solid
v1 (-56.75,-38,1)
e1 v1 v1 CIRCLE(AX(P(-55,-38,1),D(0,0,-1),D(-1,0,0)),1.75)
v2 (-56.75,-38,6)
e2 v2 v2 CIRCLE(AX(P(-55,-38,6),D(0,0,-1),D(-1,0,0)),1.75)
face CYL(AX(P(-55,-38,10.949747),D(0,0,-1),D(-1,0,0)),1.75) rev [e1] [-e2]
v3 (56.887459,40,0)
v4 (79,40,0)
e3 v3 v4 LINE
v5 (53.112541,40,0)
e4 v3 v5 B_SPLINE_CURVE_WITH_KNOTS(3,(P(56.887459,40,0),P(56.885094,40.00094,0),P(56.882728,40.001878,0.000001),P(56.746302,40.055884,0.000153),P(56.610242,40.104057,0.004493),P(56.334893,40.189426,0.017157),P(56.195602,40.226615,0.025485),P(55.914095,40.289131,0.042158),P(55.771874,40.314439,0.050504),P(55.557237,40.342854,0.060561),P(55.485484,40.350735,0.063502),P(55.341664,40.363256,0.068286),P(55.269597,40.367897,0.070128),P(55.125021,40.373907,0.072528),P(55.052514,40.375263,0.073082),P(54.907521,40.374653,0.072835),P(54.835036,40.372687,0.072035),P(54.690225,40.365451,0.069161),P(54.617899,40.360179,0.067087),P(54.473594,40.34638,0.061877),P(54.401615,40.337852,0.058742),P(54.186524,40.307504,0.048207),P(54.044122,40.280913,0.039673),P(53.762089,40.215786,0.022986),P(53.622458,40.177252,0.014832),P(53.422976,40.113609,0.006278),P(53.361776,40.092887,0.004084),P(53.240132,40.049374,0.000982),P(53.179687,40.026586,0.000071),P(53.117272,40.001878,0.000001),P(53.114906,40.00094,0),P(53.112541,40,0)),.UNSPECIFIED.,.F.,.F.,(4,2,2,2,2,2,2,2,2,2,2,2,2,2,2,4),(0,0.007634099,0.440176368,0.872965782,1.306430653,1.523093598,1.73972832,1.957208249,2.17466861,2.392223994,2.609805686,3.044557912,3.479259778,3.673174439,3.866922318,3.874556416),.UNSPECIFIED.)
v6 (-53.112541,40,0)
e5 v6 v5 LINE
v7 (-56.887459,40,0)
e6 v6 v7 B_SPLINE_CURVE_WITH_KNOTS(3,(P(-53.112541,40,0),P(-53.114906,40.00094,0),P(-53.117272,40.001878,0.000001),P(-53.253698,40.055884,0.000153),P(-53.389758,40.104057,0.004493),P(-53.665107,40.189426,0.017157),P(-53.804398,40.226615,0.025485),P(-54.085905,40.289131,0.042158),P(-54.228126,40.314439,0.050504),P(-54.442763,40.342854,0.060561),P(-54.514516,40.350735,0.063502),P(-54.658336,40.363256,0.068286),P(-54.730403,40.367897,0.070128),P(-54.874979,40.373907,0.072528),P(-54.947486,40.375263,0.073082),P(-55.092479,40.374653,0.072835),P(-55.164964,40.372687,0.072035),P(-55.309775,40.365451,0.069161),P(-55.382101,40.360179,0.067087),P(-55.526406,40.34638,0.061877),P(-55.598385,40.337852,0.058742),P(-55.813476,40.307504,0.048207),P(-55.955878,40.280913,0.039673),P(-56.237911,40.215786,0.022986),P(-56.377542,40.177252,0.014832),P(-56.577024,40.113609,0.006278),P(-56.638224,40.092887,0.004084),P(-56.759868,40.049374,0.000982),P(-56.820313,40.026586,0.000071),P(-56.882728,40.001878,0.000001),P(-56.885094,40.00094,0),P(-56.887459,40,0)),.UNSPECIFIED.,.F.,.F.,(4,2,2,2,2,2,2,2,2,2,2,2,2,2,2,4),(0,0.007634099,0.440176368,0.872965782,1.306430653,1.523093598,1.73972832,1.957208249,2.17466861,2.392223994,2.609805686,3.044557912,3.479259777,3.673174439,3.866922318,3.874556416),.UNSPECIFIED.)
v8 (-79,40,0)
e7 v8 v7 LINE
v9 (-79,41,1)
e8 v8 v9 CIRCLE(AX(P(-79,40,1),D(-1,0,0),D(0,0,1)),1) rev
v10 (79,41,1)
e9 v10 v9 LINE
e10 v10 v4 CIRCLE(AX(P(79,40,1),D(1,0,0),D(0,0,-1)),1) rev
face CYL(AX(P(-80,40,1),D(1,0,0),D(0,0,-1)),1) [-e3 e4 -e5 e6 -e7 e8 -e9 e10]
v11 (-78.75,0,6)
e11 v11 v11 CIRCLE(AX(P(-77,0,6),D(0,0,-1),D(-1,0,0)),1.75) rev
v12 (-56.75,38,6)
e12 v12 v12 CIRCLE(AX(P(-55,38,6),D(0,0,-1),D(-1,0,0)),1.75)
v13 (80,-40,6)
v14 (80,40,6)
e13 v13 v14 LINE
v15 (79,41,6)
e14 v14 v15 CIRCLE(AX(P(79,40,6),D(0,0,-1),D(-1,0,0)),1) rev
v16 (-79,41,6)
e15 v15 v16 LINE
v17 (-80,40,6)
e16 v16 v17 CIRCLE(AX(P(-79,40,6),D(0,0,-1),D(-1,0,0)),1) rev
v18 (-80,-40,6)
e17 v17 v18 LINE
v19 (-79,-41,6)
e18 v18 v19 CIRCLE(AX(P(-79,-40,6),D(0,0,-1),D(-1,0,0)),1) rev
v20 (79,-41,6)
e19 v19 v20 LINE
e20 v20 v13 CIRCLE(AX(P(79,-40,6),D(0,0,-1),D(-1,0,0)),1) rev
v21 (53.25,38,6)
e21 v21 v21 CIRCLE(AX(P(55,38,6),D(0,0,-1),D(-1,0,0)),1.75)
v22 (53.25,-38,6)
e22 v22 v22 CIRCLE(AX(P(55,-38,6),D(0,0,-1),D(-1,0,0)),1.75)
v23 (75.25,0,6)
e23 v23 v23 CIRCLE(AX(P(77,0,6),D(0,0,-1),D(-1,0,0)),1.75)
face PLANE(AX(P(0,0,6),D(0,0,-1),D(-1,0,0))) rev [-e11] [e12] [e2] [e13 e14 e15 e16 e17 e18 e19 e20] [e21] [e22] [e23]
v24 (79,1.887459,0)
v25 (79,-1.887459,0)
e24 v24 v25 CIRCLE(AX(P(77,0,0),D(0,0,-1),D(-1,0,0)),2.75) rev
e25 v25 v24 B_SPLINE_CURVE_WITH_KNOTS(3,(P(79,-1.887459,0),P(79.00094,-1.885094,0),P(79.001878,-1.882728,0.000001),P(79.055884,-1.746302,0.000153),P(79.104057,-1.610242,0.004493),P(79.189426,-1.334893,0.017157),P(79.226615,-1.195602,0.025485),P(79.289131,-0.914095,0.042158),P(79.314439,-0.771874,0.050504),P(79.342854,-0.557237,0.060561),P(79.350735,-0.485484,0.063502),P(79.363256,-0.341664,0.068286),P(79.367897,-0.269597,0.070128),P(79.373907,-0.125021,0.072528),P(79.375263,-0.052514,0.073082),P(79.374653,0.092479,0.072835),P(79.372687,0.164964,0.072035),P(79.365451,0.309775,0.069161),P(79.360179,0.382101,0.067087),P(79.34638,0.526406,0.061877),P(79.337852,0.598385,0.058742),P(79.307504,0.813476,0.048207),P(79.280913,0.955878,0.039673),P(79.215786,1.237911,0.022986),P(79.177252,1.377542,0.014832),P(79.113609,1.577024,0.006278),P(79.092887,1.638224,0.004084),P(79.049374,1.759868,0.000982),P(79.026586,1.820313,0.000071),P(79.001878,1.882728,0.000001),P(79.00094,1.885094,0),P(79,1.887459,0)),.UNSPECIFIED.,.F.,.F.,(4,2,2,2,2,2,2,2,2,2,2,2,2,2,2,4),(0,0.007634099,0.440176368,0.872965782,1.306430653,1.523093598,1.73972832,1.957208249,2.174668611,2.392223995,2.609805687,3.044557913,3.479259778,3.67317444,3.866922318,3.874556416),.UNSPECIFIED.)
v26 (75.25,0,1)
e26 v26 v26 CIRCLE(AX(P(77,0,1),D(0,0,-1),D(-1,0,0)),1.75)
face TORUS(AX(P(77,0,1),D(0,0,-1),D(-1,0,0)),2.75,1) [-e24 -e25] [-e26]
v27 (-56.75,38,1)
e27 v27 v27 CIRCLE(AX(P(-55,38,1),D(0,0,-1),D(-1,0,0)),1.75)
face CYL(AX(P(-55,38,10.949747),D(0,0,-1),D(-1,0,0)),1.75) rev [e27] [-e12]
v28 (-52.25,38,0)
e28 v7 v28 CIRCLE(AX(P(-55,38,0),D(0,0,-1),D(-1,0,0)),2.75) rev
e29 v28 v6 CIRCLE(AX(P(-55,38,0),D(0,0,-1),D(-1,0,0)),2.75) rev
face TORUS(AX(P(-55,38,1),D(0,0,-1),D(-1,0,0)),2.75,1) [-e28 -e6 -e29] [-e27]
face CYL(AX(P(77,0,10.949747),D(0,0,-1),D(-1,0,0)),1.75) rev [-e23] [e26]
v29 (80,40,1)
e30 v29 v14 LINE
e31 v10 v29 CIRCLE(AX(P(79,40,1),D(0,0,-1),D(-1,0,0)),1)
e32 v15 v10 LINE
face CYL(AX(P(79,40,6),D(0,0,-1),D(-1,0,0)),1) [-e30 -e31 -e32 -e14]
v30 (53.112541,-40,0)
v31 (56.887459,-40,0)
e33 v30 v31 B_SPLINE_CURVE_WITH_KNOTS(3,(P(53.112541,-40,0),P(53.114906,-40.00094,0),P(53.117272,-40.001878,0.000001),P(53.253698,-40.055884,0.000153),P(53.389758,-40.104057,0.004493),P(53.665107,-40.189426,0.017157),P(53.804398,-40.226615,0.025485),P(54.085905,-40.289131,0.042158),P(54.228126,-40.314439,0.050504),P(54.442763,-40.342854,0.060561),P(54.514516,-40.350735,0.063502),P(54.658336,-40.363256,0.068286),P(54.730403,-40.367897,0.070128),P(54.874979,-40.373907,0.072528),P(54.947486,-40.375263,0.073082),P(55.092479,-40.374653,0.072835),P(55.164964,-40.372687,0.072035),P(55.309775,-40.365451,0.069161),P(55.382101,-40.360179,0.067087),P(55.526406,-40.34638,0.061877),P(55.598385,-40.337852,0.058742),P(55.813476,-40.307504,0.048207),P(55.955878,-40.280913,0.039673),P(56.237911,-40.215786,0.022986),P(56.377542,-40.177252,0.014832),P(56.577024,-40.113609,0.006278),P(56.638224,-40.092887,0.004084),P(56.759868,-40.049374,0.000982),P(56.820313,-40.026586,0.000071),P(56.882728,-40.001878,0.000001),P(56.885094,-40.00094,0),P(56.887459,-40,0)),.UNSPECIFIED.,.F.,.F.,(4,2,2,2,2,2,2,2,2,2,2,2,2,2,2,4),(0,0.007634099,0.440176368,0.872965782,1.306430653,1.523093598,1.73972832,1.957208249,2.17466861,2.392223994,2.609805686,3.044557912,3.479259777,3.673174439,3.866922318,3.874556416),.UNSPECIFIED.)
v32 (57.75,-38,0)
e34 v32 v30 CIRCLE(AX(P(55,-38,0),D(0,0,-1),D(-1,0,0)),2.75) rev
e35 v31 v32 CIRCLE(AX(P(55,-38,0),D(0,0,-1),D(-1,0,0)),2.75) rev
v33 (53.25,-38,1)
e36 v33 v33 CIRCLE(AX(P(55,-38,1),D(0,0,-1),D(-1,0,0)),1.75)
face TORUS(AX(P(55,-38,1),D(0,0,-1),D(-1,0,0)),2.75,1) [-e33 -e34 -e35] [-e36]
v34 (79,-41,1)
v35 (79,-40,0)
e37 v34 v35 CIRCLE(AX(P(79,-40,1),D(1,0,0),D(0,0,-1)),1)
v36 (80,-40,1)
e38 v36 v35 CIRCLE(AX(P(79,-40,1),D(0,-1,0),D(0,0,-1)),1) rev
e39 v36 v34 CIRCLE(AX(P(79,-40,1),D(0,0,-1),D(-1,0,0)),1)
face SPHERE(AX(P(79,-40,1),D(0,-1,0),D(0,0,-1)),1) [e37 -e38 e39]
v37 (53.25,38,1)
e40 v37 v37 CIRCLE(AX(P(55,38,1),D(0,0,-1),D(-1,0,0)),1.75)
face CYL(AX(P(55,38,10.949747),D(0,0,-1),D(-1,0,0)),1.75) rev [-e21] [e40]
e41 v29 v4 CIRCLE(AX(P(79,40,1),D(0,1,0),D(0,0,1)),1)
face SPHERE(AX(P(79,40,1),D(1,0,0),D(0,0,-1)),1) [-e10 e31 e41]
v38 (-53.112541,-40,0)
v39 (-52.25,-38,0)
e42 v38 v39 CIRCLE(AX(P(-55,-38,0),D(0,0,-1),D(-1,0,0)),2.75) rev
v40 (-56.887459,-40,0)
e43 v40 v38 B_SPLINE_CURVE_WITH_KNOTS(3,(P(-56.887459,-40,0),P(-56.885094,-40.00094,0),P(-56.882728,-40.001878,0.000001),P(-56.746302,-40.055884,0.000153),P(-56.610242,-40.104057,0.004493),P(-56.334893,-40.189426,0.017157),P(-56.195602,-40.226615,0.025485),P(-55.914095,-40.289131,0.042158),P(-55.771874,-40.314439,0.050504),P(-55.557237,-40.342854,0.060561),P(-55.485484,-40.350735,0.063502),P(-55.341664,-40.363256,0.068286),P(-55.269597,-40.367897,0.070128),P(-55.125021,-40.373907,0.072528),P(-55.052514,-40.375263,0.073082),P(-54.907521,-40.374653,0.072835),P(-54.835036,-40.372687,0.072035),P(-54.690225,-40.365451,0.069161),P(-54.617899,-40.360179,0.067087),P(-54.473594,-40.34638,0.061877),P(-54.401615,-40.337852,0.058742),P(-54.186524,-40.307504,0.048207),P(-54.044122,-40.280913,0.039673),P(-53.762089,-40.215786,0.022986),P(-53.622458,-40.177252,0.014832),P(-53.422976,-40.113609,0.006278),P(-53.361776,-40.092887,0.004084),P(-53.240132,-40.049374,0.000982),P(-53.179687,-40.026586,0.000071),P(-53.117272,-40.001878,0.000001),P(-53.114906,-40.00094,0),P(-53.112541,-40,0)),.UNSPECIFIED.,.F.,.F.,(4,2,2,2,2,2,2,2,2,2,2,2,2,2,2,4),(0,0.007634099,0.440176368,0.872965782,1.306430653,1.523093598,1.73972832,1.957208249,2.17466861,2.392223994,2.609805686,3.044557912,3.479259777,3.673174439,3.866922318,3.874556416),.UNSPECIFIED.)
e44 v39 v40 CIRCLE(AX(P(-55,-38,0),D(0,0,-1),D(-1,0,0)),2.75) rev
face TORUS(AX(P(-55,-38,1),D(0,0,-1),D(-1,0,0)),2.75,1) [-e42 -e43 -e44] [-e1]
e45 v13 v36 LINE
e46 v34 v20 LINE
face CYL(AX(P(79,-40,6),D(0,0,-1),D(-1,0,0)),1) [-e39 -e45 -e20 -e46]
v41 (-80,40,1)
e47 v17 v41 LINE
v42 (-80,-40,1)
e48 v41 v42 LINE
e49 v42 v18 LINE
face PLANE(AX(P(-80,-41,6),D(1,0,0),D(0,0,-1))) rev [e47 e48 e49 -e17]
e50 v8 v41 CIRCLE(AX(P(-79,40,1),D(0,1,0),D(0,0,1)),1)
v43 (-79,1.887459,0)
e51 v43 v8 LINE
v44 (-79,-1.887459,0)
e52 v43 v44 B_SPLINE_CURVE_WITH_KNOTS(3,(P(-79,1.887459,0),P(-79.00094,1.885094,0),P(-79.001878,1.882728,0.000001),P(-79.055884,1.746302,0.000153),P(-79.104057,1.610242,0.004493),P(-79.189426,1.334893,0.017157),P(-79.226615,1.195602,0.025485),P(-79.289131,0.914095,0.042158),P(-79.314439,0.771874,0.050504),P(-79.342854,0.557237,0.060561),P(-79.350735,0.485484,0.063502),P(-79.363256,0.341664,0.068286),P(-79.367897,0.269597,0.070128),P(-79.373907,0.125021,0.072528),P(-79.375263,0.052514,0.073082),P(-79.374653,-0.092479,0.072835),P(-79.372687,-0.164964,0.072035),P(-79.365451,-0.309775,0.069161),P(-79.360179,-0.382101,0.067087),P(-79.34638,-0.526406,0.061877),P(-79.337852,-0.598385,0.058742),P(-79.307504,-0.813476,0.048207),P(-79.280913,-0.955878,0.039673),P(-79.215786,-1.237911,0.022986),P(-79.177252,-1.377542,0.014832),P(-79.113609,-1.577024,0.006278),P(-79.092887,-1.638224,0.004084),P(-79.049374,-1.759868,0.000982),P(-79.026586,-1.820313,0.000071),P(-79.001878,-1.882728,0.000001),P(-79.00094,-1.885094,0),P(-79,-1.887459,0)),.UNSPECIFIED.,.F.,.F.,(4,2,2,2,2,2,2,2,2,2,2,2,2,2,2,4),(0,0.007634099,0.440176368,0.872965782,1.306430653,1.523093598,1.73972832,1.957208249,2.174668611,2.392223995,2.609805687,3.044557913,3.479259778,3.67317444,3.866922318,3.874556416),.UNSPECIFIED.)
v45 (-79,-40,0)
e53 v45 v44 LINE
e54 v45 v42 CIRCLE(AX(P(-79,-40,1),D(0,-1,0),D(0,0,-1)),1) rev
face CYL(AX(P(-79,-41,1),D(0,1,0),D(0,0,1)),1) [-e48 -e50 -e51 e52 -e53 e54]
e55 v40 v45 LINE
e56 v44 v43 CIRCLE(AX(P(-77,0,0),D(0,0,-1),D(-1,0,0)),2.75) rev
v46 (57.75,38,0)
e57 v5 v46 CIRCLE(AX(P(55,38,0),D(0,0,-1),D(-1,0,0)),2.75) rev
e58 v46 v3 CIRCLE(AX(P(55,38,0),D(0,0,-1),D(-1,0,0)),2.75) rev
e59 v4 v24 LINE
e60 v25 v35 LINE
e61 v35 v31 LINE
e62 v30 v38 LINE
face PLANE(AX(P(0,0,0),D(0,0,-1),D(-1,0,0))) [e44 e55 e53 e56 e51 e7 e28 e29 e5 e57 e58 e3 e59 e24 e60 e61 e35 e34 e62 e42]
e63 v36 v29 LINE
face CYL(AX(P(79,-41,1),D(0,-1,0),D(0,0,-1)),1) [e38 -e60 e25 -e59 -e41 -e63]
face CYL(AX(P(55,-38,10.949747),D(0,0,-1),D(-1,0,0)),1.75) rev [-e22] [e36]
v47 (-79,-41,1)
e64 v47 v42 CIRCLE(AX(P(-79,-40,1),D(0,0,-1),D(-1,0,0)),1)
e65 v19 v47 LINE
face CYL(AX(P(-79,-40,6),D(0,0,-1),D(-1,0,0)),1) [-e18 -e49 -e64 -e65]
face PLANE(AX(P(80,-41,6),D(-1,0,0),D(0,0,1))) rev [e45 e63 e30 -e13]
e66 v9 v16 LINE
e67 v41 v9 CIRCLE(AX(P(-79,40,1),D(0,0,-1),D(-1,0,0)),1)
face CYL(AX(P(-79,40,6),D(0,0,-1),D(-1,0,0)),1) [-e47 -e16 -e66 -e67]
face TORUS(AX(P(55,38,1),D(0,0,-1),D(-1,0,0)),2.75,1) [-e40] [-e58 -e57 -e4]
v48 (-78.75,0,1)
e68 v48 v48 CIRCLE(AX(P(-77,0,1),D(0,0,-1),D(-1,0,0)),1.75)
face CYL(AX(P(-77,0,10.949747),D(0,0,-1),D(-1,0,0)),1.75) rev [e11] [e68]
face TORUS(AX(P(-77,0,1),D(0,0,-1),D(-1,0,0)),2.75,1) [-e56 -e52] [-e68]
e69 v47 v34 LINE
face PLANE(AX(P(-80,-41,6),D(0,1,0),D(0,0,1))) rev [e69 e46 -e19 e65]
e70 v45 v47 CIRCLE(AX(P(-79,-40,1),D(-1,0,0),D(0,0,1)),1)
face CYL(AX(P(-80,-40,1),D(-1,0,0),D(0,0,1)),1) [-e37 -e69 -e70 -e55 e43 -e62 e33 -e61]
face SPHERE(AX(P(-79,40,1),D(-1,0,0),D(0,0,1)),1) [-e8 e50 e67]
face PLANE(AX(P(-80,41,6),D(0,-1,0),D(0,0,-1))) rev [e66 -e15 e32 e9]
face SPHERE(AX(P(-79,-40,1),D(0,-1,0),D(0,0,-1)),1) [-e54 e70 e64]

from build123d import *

# Parameters (mm, degrees)
ESQUISSE1_W             = 160
ESQUISSE1_H             = 82
BOSS_EXTRU_1_DEPTH      = 6
ESQUISSE2_R             = 1.75
ENL_V_MAT_EXTRU_1_DEPTH = 6
ESQUISSE3_R             = 1.75
ENL_V_MAT_EXTRU_2_DEPTH = 6
CONG_2_R                = 1


with BuildPart() as part:
    # Esquisse1 → Boss.-Extru.1 (new body)
    with BuildSketch(Plane.XY):
        Rectangle(ESQUISSE1_W, ESQUISSE1_H)
    extrude(amount=BOSS_EXTRU_1_DEPTH)

    # Esquisse2 → Enlèv. mat.-Extru.1 (cut)
    with BuildSketch(Plane.XY):
        with Locations(Location((-55, -38, 0), (0, 0, 180))):
            Circle(ESQUISSE2_R)
        with Locations(Location((55, -38, 0), (0, 0, 180))):
            Circle(ESQUISSE2_R)
        with Locations(Location((-55, 38, 0), (0, 0, 180))):
            Circle(ESQUISSE2_R)
        with Locations(Location((55, 38, 0), (0, 0, 180))):
            Circle(ESQUISSE2_R)
    extrude(amount=ENL_V_MAT_EXTRU_1_DEPTH, mode=Mode.SUBTRACT)

    # Esquisse3 → Enlèv. mat.-Extru.2 (cut)
    with BuildSketch(Plane.XY):
        with Locations(Location((77, 0, 0), (0, 0, 180))):
            Circle(ESQUISSE3_R)
    enl_v_mat_extru_2 = extrude(amount=ENL_V_MAT_EXTRU_2_DEPTH, mode=Mode.SUBTRACT)

    # Symétrie1: Enlèv. mat.-Extru.2 across plane
    add(enl_v_mat_extru_2.mirror(Plane(origin=(0, 0, 0), x_dir=(0, 0, 1), z_dir=(1, 0, 0))), mode=Mode.SUBTRACT)

    # Congé2
    # the kernel refuses this fillet: 1 mm, written as the material it takes off along each edge
    with BuildSketch(Plane(origin=(-79, -40, 1), x_dir=(-1, 0, 0), z_dir=(0, -1, 0))) as cong_2_piece_1_section:
        Polygon((0, 0), (CONG_2_R, 0), (CONG_2_R, CONG_2_R), (0, CONG_2_R), align=None)
    cong_2_piece_1 = extrude(amount=CONG_2_R, mode=Mode.PRIVATE)
    cong_2_piece_1 = cong_2_piece_1 - Plane(origin=(-79, -40, 1), x_dir=(0.7071067811865475, 0, 0.7071067811865475), z_dir=(0, -1, 0)) * Sphere(CONG_2_R, mode=Mode.PRIVATE)
    add(cong_2_piece_1, mode=Mode.SUBTRACT)
    with BuildSketch(Plane(origin=(79, -40, 1), x_dir=(1, 0, 0), z_dir=(0, -1, 0))) as cong_2_piece_2_section:
        Polygon((0, 0), (CONG_2_R, 0), (CONG_2_R, -CONG_2_R), (0, -CONG_2_R), align=None)
    cong_2_piece_2 = extrude(amount=CONG_2_R, mode=Mode.PRIVATE)
    cong_2_piece_2 = cong_2_piece_2 - Plane(origin=(79, -40, 1), x_dir=(-0.7071067811865475, 0, 0.7071067811865475), z_dir=(0, -1, 0)) * Sphere(CONG_2_R, mode=Mode.PRIVATE)
    add(cong_2_piece_2, mode=Mode.SUBTRACT)
    with BuildSketch(Plane(origin=(-79, 40, 1), x_dir=(0, 0, -1), z_dir=(-1, 0, 0))) as cong_2_piece_3_section:
        Polygon((0, 0), (CONG_2_R, 0), (CONG_2_R, -CONG_2_R), (0, -CONG_2_R), align=None)
    cong_2_piece_3 = extrude(amount=CONG_2_R, mode=Mode.PRIVATE)
    cong_2_piece_3 = cong_2_piece_3 - Plane(origin=(-79, 40, 1), x_dir=(0, -0.7071067811865475, 0.7071067811865475), z_dir=(-1, 0, 0)) * Sphere(CONG_2_R, mode=Mode.PRIVATE)
    add(cong_2_piece_3, mode=Mode.SUBTRACT)
    with BuildSketch(Plane(origin=(79, 40, 1), x_dir=(0, 0, -1), z_dir=(1, 0, 0))) as cong_2_piece_4_section:
        Polygon((0, 0), (CONG_2_R, 0), (CONG_2_R, CONG_2_R), (0, CONG_2_R), align=None)
    cong_2_piece_4 = extrude(amount=CONG_2_R, mode=Mode.PRIVATE)
    cong_2_piece_4 = cong_2_piece_4 - Plane(origin=(79, 40, 1), x_dir=(0, -0.7071067811865475, 0.7071067811865475), z_dir=(1, 0, 0)) * Sphere(CONG_2_R, mode=Mode.PRIVATE)
    add(cong_2_piece_4, mode=Mode.SUBTRACT)
    with BuildSketch(Plane(origin=(55, -38, 0), x_dir=(-1, 0, 0), z_dir=(0, 1, 0))) as cong_2_piece_5:
        with BuildLine():
            CenterArc((1.75 + CONG_2_R, CONG_2_R), CONG_2_R, 180, 90)
            Line((1.75, CONG_2_R), (1.75, 0))
            Line((1.75, 0), (1.75 + CONG_2_R, 0))
        make_face()
    revolve(axis=Axis((55, -38, 0), (0, 0, 1)), mode=Mode.SUBTRACT)
    with BuildSketch(Plane(origin=(-55, 38, 0), x_dir=(-1, 0, 0), z_dir=(0, 1, 0))) as cong_2_piece_6:
        with BuildLine():
            CenterArc((1.75 + CONG_2_R, CONG_2_R), CONG_2_R, 180, 90)
            Line((1.75, CONG_2_R), (1.75, 0))
            Line((1.75, 0), (1.75 + CONG_2_R, 0))
        make_face()
    revolve(axis=Axis((-55, 38, 0), (0, 0, 1)), mode=Mode.SUBTRACT)
    with BuildSketch(Plane(origin=(55, 38, 0), x_dir=(-1, 0, 0), z_dir=(0, 1, 0))) as cong_2_piece_7:
        with BuildLine():
            CenterArc((1.75 + CONG_2_R, CONG_2_R), CONG_2_R, 180, 90)
            Line((1.75, CONG_2_R), (1.75, 0))
            Line((1.75, 0), (1.75 + CONG_2_R, 0))
        make_face()
    revolve(axis=Axis((55, 38, 0), (0, 0, 1)), mode=Mode.SUBTRACT)
    with BuildSketch(Plane(origin=(-55, -38, 0), x_dir=(-1, 0, 0), z_dir=(0, 1, 0))) as cong_2_piece_8:
        with BuildLine():
            CenterArc((1.75 + CONG_2_R, CONG_2_R), CONG_2_R, 180, 90)
            Line((1.75, CONG_2_R), (1.75, 0))
            Line((1.75, 0), (1.75 + CONG_2_R, 0))
        make_face()
    revolve(axis=Axis((-55, -38, 0), (0, 0, 1)), mode=Mode.SUBTRACT)
    with BuildSketch(Plane(origin=(77, 0, 0), x_dir=(-1, 0, 0), z_dir=(0, 1, 0))) as cong_2_piece_9:
        with BuildLine():
            CenterArc((1.75 + CONG_2_R, CONG_2_R), CONG_2_R, 180, 90)
            Line((1.75, CONG_2_R), (1.75, 0))
            Line((1.75, 0), (1.75 + CONG_2_R, 0))
        make_face()
    revolve(axis=Axis((77, 0, 0), (0, 0, 1)), mode=Mode.SUBTRACT)
    with BuildSketch(Plane(origin=(-77, 0, 0), x_dir=(1, 0, 0), z_dir=(0, 1, 0))) as cong_2_piece_10:
        with BuildLine():
            CenterArc((1.75 + CONG_2_R, -CONG_2_R), CONG_2_R, 90, 90)
            Line((1.75, -CONG_2_R), (1.75, 0))
            Line((1.75, 0), (1.75 + CONG_2_R, 0))
        make_face()
    revolve(axis=Axis((-77, 0, 0), (0, 0, -1)), mode=Mode.SUBTRACT)
    with BuildSketch(Plane(origin=(-79, -41, 0), x_dir=(0, 0, 1), z_dir=(1, 0, 0))) as cong_2_piece_11:
        with BuildLine():
            CenterArc((CONG_2_R, -CONG_2_R), CONG_2_R, 90, 90)
            Line((0, -CONG_2_R), (0, 0))
            Line((0, 0), (CONG_2_R, 0))
        make_face()
    extrude(amount=158, mode=Mode.SUBTRACT)
    with BuildSketch(Plane(origin=(-80, 40, 0), x_dir=(0, 0, 1), z_dir=(0, -1, 0)), Plane(origin=(80, -40, 0), x_dir=(0, 0, 1), z_dir=(0, 1, 0))) as cong_2_piece_12:
        with BuildLine():
            CenterArc((CONG_2_R, -CONG_2_R), CONG_2_R, 90, 90)
            Line((0, -CONG_2_R), (0, 0))
            Line((0, 0), (CONG_2_R, 0))
        make_face()
    extrude(amount=80, mode=Mode.SUBTRACT)
    with BuildSketch(Plane(origin=(79, 41, 0), x_dir=(0, -1, 0), z_dir=(-1, 0, 0))) as cong_2_piece_13:
        with BuildLine():
            CenterArc((CONG_2_R, CONG_2_R), CONG_2_R, 180, 90)
            Line((0, CONG_2_R), (0, 0))
            Line((0, 0), (CONG_2_R, 0))
        make_face()
    extrude(amount=158, mode=Mode.SUBTRACT)
    with BuildSketch(Plane(origin=(80, -41, 1), x_dir=(-1, 0, 0), z_dir=(0, 0, 1)), Plane(origin=(80, 41, 1), x_dir=(0, -1, 0), z_dir=(0, 0, 1))) as cong_2_piece_14:
        with BuildLine():
            CenterArc((CONG_2_R, -CONG_2_R), CONG_2_R, 90, 90)
            Line((0, -CONG_2_R), (0, 0))
            Line((0, 0), (CONG_2_R, 0))
        make_face()
    extrude(amount=7.5, mode=Mode.SUBTRACT)
    with BuildSketch(Plane(origin=(-80, -41, 1), x_dir=(1, 0, 0), z_dir=(0, 0, 1)), Plane(origin=(-80, 41, 1), x_dir=(0, -1, 0), z_dir=(0, 0, 1))) as cong_2_piece_15:
        with BuildLine():
            CenterArc((CONG_2_R, CONG_2_R), CONG_2_R, 180, 90)
            Line((0, CONG_2_R), (0, 0))
            Line((0, 0), (CONG_2_R, 0))
        make_face()
    extrude(amount=7.5, mode=Mode.SUBTRACT)


solid = part.part
